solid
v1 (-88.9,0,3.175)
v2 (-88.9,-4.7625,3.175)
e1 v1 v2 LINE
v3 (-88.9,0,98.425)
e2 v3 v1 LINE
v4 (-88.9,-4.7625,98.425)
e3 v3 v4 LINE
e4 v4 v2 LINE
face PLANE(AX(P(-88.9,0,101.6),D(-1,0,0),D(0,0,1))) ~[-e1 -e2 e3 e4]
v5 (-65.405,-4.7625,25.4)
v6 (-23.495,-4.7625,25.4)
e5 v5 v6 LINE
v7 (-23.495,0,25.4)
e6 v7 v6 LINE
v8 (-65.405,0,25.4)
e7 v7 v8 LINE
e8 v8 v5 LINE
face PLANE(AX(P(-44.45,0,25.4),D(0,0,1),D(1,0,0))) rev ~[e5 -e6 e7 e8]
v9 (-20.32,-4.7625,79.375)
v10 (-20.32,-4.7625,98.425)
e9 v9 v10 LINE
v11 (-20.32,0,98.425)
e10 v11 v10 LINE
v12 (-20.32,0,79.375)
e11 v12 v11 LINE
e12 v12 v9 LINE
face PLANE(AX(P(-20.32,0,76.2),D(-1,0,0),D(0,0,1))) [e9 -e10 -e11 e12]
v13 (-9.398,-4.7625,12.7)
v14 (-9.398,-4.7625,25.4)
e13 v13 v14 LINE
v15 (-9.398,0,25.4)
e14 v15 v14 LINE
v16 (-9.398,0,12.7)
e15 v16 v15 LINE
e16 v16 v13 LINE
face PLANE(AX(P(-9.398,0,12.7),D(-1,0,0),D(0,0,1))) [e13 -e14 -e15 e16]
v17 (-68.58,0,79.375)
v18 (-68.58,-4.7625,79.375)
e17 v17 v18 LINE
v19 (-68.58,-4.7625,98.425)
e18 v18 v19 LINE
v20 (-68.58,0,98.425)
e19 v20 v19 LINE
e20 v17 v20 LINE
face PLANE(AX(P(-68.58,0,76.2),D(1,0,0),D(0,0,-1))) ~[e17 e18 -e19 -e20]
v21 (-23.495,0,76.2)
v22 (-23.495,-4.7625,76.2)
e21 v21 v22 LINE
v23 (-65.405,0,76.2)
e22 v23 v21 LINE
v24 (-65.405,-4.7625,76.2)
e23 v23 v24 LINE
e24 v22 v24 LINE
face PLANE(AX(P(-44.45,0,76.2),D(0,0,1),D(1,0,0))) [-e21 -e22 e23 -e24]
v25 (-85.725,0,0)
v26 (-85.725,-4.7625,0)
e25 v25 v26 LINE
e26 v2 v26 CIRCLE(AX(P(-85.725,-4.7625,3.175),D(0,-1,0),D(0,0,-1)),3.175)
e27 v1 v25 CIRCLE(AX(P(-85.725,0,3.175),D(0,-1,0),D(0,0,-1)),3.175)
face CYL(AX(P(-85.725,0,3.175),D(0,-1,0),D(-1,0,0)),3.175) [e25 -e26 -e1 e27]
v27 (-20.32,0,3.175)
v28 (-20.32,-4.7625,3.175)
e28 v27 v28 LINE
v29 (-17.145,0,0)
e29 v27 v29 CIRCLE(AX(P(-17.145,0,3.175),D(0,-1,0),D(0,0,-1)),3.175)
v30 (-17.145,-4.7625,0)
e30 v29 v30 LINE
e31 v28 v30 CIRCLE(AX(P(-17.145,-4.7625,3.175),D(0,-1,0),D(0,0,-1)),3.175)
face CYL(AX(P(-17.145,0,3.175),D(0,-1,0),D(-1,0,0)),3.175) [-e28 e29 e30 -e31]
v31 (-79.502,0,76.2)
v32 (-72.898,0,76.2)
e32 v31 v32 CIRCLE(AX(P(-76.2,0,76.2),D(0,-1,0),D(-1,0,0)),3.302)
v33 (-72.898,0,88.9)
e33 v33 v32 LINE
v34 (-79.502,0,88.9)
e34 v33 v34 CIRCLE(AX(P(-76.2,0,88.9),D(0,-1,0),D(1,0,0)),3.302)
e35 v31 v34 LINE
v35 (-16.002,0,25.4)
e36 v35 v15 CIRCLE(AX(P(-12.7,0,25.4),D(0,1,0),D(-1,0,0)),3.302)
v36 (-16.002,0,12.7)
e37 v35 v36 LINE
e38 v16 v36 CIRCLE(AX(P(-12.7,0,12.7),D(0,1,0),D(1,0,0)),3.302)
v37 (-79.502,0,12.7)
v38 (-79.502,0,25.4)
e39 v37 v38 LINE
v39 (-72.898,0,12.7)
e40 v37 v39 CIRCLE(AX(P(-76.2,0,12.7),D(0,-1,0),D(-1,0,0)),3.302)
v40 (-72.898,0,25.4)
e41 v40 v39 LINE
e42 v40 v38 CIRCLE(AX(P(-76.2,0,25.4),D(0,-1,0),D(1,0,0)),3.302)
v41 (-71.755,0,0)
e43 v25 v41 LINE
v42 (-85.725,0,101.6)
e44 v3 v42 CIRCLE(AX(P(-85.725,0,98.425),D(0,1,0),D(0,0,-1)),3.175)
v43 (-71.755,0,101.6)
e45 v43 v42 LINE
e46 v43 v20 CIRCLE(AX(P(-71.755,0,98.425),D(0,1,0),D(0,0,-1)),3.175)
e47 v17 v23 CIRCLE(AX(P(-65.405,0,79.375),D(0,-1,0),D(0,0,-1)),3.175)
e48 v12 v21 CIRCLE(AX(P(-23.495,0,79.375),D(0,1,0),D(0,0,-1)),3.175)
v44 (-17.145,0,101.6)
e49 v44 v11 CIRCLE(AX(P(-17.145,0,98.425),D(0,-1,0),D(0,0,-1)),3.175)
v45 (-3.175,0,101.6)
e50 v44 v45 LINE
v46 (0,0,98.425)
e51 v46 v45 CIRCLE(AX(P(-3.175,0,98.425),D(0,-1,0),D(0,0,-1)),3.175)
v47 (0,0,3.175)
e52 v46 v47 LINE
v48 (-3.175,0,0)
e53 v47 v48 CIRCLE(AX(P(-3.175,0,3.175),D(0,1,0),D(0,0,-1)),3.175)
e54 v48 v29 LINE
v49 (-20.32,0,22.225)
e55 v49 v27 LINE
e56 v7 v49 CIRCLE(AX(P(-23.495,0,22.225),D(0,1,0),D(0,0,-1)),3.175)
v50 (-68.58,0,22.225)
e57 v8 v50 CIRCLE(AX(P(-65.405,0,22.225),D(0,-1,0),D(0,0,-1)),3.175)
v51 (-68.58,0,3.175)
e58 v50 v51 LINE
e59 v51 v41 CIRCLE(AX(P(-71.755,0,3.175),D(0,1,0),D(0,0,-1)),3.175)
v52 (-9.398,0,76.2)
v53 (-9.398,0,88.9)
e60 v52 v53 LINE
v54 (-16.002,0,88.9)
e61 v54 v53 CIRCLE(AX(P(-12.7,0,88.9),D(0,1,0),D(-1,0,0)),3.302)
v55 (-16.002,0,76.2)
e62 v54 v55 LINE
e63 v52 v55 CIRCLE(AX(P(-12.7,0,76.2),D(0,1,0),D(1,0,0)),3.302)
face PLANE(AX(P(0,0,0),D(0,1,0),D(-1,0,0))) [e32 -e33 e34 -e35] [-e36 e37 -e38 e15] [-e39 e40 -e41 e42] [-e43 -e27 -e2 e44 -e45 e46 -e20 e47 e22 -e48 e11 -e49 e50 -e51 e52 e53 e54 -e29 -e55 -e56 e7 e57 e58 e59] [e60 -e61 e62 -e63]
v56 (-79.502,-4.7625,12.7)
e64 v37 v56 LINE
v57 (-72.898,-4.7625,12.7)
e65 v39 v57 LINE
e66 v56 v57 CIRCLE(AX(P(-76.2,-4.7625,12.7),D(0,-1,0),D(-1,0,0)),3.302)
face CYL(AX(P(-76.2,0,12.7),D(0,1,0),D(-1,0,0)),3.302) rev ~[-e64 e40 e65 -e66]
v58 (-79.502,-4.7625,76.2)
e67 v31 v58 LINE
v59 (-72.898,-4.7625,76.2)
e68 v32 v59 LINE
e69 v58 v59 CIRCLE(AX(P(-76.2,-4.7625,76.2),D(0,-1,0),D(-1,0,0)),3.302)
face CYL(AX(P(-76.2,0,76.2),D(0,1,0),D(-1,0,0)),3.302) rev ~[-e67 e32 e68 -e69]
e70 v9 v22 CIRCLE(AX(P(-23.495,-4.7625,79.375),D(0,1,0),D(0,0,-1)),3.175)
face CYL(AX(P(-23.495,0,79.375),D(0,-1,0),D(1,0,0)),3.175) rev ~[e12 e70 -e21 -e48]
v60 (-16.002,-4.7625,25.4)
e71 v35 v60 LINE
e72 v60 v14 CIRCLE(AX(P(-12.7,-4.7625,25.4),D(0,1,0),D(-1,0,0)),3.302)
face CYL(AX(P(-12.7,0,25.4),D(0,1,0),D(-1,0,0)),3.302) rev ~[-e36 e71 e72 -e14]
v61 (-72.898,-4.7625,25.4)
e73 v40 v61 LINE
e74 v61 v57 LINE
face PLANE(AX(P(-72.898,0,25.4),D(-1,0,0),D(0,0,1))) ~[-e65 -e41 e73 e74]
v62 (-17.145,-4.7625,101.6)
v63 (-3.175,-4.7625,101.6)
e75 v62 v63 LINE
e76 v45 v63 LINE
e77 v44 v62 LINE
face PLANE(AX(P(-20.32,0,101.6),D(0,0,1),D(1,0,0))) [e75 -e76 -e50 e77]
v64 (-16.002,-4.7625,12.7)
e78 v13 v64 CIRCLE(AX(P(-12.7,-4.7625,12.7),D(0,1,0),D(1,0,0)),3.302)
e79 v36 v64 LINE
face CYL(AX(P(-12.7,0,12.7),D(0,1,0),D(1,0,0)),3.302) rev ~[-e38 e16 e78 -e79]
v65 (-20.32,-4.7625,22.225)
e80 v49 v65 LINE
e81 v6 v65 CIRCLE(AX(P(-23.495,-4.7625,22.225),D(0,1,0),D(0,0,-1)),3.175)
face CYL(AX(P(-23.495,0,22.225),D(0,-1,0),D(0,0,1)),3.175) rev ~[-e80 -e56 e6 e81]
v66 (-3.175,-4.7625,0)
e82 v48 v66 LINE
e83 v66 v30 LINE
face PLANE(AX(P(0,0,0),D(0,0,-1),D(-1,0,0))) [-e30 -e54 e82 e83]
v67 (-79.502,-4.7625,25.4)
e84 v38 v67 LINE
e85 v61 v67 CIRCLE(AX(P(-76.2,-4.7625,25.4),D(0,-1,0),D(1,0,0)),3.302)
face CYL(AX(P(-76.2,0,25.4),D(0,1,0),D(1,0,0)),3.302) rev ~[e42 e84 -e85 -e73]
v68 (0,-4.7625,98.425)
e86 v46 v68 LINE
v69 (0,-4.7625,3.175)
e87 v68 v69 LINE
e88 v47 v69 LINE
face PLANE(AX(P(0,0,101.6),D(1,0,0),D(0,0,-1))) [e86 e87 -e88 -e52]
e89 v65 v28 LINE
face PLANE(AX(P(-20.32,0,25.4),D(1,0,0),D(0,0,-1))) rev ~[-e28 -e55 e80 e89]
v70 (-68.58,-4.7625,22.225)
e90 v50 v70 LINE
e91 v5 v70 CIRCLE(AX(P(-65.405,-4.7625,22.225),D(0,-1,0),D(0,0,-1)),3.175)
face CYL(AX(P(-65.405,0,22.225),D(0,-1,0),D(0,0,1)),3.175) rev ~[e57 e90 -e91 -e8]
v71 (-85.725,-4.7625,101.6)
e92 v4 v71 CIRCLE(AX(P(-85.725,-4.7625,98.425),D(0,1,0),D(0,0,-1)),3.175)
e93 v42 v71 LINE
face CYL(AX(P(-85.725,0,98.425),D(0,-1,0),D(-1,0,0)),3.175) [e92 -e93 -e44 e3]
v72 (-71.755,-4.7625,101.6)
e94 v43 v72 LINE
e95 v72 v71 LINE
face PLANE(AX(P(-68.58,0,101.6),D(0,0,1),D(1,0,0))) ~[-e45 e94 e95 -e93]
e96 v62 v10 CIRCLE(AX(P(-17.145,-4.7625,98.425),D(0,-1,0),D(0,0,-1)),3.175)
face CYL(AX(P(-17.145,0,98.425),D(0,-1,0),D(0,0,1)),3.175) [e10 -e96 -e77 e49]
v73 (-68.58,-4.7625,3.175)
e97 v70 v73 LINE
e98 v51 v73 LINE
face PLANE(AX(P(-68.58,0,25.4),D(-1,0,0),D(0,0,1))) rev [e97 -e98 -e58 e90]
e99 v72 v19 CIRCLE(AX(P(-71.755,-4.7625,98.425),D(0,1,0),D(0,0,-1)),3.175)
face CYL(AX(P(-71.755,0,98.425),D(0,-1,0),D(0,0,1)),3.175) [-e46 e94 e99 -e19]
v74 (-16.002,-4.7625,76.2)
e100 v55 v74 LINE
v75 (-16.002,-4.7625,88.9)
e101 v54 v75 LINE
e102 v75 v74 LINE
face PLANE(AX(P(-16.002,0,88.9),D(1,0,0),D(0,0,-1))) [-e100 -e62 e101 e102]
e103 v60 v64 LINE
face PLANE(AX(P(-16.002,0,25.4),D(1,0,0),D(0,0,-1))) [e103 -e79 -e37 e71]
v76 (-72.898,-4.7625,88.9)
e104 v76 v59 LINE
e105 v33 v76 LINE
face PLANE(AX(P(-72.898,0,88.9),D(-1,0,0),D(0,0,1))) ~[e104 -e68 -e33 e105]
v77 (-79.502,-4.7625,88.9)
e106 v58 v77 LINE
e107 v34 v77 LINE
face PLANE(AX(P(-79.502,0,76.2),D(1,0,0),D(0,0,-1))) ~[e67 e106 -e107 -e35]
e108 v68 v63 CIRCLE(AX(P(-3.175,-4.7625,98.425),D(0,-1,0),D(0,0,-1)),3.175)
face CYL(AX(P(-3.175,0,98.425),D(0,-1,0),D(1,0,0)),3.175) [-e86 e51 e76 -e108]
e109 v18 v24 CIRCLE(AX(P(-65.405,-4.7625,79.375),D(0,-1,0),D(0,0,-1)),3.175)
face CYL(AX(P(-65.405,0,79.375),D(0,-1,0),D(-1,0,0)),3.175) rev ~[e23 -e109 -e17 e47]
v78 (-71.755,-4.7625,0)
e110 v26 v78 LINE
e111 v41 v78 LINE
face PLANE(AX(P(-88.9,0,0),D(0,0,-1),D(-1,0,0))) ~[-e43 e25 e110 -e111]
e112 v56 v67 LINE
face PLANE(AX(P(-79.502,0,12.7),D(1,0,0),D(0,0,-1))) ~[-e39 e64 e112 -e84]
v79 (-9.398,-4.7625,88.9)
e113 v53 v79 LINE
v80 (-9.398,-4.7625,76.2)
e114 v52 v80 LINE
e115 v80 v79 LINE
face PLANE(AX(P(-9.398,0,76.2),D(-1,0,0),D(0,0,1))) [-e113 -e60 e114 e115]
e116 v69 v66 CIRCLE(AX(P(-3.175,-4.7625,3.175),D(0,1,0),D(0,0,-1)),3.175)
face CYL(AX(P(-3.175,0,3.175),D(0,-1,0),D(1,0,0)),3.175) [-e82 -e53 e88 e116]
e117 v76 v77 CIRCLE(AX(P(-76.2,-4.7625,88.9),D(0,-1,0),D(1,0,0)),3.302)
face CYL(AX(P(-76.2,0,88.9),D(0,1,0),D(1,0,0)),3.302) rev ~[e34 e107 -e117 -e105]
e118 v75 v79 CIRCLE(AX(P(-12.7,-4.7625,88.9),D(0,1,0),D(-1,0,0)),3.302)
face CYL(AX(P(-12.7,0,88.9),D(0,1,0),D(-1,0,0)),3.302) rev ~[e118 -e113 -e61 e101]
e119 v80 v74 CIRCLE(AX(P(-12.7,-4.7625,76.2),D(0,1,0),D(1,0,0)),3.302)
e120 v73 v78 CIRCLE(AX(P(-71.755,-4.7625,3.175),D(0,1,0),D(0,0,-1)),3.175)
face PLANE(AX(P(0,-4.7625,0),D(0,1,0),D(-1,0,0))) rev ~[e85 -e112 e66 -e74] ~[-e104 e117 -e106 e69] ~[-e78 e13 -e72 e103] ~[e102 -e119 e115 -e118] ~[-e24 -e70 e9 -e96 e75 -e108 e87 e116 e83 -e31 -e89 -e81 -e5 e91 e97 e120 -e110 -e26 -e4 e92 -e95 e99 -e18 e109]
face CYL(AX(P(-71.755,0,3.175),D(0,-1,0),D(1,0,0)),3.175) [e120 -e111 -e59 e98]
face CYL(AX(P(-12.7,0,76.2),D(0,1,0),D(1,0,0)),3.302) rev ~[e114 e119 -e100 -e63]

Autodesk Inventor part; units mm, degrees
ref_plane "YZ Plane" through (0, 0, 0) normal (1, 0, 0) x (0, 1, 0)
ref_plane "XZ Plane" through (0, 0, 0) normal (0, 1, 0) x (-1, 0, 0)
ref_plane "XY Plane" through (0, 0, 0) normal (0, 0, 1) x (1, 0, 0)
sketch "Sketch1" plane through (0, 0, 0) normal (0, 1, 0) x (-1, 0, 0)
  line L0 (0, 0) -> (20.32, 0)
  line L1 (0, 101.6) -> (0, 0)
  line L2 (44.45, 76.2) -> (20.32, 76.2)
  line L3 (20.32, 76.2) -> (20.32, 101.6)
  line L4 (44.45, 76.2) -> (44.45, 25.4)
  line L5 (20.32, 101.6) -> (0, 101.6)
  line L6 (16.002, 88.9) -> (16.002, 76.2)
  line L7 (9.398, 76.2) -> (9.398, 88.9)
  arc A0 (16.002, 88.9) -> (9.398, 88.9) centre (12.7, 88.9) ccw
  arc A1 (9.398, 76.2) -> (16.002, 76.2) centre (12.7, 76.2) ccw
  line L8 (16.002, 25.4) -> (16.002, 12.7)
  line L9 (9.398, 12.7) -> (9.398, 25.4)
  arc A2 (16.002, 25.4) -> (9.398, 25.4) centre (12.7, 25.4) ccw
  arc A3 (9.398, 12.7) -> (16.002, 12.7) centre (12.7, 12.7) ccw
  line L10 (44.45, 25.4) -> (20.32, 25.4)
  line L11 (20.32, 25.4) -> (20.32, 0)
  dimension "d1" = 101.6
  dimension "d8" = 44.45
  dimension "d11" = 6.604
  dimension "d14" = 12.7
  dimension "d15" = 12.7
  dimension "d18" = 12.7
  dimension "d19" = 20.32
  dimension "d21" = 31.75
  dimension "d23" = 50.8
  dimension "d24" = 25.4
  dimension "d25" = 63.5
  dimension "d26" = 6.604
extrude "Extrusion1" add sketch "Sketch1" against normal blind 4.7625
fillet "Fillet1" radius 3.175 6 edges at (-20.32, -2.3813, 76.2) (-20.32, -2.3813, 101.6) (0, -2.3813, 101.6) (0, -2.3813, 0) (-20.32, -2.3813, 0) (-20.32, -2.3813, 25.4)
mirror "Mirror2" about plane through (-44.45, 0, 76.2) normal (-1, 0, 0)
equation "\"d26\" = d11"
properties part number "torchMount_back"
